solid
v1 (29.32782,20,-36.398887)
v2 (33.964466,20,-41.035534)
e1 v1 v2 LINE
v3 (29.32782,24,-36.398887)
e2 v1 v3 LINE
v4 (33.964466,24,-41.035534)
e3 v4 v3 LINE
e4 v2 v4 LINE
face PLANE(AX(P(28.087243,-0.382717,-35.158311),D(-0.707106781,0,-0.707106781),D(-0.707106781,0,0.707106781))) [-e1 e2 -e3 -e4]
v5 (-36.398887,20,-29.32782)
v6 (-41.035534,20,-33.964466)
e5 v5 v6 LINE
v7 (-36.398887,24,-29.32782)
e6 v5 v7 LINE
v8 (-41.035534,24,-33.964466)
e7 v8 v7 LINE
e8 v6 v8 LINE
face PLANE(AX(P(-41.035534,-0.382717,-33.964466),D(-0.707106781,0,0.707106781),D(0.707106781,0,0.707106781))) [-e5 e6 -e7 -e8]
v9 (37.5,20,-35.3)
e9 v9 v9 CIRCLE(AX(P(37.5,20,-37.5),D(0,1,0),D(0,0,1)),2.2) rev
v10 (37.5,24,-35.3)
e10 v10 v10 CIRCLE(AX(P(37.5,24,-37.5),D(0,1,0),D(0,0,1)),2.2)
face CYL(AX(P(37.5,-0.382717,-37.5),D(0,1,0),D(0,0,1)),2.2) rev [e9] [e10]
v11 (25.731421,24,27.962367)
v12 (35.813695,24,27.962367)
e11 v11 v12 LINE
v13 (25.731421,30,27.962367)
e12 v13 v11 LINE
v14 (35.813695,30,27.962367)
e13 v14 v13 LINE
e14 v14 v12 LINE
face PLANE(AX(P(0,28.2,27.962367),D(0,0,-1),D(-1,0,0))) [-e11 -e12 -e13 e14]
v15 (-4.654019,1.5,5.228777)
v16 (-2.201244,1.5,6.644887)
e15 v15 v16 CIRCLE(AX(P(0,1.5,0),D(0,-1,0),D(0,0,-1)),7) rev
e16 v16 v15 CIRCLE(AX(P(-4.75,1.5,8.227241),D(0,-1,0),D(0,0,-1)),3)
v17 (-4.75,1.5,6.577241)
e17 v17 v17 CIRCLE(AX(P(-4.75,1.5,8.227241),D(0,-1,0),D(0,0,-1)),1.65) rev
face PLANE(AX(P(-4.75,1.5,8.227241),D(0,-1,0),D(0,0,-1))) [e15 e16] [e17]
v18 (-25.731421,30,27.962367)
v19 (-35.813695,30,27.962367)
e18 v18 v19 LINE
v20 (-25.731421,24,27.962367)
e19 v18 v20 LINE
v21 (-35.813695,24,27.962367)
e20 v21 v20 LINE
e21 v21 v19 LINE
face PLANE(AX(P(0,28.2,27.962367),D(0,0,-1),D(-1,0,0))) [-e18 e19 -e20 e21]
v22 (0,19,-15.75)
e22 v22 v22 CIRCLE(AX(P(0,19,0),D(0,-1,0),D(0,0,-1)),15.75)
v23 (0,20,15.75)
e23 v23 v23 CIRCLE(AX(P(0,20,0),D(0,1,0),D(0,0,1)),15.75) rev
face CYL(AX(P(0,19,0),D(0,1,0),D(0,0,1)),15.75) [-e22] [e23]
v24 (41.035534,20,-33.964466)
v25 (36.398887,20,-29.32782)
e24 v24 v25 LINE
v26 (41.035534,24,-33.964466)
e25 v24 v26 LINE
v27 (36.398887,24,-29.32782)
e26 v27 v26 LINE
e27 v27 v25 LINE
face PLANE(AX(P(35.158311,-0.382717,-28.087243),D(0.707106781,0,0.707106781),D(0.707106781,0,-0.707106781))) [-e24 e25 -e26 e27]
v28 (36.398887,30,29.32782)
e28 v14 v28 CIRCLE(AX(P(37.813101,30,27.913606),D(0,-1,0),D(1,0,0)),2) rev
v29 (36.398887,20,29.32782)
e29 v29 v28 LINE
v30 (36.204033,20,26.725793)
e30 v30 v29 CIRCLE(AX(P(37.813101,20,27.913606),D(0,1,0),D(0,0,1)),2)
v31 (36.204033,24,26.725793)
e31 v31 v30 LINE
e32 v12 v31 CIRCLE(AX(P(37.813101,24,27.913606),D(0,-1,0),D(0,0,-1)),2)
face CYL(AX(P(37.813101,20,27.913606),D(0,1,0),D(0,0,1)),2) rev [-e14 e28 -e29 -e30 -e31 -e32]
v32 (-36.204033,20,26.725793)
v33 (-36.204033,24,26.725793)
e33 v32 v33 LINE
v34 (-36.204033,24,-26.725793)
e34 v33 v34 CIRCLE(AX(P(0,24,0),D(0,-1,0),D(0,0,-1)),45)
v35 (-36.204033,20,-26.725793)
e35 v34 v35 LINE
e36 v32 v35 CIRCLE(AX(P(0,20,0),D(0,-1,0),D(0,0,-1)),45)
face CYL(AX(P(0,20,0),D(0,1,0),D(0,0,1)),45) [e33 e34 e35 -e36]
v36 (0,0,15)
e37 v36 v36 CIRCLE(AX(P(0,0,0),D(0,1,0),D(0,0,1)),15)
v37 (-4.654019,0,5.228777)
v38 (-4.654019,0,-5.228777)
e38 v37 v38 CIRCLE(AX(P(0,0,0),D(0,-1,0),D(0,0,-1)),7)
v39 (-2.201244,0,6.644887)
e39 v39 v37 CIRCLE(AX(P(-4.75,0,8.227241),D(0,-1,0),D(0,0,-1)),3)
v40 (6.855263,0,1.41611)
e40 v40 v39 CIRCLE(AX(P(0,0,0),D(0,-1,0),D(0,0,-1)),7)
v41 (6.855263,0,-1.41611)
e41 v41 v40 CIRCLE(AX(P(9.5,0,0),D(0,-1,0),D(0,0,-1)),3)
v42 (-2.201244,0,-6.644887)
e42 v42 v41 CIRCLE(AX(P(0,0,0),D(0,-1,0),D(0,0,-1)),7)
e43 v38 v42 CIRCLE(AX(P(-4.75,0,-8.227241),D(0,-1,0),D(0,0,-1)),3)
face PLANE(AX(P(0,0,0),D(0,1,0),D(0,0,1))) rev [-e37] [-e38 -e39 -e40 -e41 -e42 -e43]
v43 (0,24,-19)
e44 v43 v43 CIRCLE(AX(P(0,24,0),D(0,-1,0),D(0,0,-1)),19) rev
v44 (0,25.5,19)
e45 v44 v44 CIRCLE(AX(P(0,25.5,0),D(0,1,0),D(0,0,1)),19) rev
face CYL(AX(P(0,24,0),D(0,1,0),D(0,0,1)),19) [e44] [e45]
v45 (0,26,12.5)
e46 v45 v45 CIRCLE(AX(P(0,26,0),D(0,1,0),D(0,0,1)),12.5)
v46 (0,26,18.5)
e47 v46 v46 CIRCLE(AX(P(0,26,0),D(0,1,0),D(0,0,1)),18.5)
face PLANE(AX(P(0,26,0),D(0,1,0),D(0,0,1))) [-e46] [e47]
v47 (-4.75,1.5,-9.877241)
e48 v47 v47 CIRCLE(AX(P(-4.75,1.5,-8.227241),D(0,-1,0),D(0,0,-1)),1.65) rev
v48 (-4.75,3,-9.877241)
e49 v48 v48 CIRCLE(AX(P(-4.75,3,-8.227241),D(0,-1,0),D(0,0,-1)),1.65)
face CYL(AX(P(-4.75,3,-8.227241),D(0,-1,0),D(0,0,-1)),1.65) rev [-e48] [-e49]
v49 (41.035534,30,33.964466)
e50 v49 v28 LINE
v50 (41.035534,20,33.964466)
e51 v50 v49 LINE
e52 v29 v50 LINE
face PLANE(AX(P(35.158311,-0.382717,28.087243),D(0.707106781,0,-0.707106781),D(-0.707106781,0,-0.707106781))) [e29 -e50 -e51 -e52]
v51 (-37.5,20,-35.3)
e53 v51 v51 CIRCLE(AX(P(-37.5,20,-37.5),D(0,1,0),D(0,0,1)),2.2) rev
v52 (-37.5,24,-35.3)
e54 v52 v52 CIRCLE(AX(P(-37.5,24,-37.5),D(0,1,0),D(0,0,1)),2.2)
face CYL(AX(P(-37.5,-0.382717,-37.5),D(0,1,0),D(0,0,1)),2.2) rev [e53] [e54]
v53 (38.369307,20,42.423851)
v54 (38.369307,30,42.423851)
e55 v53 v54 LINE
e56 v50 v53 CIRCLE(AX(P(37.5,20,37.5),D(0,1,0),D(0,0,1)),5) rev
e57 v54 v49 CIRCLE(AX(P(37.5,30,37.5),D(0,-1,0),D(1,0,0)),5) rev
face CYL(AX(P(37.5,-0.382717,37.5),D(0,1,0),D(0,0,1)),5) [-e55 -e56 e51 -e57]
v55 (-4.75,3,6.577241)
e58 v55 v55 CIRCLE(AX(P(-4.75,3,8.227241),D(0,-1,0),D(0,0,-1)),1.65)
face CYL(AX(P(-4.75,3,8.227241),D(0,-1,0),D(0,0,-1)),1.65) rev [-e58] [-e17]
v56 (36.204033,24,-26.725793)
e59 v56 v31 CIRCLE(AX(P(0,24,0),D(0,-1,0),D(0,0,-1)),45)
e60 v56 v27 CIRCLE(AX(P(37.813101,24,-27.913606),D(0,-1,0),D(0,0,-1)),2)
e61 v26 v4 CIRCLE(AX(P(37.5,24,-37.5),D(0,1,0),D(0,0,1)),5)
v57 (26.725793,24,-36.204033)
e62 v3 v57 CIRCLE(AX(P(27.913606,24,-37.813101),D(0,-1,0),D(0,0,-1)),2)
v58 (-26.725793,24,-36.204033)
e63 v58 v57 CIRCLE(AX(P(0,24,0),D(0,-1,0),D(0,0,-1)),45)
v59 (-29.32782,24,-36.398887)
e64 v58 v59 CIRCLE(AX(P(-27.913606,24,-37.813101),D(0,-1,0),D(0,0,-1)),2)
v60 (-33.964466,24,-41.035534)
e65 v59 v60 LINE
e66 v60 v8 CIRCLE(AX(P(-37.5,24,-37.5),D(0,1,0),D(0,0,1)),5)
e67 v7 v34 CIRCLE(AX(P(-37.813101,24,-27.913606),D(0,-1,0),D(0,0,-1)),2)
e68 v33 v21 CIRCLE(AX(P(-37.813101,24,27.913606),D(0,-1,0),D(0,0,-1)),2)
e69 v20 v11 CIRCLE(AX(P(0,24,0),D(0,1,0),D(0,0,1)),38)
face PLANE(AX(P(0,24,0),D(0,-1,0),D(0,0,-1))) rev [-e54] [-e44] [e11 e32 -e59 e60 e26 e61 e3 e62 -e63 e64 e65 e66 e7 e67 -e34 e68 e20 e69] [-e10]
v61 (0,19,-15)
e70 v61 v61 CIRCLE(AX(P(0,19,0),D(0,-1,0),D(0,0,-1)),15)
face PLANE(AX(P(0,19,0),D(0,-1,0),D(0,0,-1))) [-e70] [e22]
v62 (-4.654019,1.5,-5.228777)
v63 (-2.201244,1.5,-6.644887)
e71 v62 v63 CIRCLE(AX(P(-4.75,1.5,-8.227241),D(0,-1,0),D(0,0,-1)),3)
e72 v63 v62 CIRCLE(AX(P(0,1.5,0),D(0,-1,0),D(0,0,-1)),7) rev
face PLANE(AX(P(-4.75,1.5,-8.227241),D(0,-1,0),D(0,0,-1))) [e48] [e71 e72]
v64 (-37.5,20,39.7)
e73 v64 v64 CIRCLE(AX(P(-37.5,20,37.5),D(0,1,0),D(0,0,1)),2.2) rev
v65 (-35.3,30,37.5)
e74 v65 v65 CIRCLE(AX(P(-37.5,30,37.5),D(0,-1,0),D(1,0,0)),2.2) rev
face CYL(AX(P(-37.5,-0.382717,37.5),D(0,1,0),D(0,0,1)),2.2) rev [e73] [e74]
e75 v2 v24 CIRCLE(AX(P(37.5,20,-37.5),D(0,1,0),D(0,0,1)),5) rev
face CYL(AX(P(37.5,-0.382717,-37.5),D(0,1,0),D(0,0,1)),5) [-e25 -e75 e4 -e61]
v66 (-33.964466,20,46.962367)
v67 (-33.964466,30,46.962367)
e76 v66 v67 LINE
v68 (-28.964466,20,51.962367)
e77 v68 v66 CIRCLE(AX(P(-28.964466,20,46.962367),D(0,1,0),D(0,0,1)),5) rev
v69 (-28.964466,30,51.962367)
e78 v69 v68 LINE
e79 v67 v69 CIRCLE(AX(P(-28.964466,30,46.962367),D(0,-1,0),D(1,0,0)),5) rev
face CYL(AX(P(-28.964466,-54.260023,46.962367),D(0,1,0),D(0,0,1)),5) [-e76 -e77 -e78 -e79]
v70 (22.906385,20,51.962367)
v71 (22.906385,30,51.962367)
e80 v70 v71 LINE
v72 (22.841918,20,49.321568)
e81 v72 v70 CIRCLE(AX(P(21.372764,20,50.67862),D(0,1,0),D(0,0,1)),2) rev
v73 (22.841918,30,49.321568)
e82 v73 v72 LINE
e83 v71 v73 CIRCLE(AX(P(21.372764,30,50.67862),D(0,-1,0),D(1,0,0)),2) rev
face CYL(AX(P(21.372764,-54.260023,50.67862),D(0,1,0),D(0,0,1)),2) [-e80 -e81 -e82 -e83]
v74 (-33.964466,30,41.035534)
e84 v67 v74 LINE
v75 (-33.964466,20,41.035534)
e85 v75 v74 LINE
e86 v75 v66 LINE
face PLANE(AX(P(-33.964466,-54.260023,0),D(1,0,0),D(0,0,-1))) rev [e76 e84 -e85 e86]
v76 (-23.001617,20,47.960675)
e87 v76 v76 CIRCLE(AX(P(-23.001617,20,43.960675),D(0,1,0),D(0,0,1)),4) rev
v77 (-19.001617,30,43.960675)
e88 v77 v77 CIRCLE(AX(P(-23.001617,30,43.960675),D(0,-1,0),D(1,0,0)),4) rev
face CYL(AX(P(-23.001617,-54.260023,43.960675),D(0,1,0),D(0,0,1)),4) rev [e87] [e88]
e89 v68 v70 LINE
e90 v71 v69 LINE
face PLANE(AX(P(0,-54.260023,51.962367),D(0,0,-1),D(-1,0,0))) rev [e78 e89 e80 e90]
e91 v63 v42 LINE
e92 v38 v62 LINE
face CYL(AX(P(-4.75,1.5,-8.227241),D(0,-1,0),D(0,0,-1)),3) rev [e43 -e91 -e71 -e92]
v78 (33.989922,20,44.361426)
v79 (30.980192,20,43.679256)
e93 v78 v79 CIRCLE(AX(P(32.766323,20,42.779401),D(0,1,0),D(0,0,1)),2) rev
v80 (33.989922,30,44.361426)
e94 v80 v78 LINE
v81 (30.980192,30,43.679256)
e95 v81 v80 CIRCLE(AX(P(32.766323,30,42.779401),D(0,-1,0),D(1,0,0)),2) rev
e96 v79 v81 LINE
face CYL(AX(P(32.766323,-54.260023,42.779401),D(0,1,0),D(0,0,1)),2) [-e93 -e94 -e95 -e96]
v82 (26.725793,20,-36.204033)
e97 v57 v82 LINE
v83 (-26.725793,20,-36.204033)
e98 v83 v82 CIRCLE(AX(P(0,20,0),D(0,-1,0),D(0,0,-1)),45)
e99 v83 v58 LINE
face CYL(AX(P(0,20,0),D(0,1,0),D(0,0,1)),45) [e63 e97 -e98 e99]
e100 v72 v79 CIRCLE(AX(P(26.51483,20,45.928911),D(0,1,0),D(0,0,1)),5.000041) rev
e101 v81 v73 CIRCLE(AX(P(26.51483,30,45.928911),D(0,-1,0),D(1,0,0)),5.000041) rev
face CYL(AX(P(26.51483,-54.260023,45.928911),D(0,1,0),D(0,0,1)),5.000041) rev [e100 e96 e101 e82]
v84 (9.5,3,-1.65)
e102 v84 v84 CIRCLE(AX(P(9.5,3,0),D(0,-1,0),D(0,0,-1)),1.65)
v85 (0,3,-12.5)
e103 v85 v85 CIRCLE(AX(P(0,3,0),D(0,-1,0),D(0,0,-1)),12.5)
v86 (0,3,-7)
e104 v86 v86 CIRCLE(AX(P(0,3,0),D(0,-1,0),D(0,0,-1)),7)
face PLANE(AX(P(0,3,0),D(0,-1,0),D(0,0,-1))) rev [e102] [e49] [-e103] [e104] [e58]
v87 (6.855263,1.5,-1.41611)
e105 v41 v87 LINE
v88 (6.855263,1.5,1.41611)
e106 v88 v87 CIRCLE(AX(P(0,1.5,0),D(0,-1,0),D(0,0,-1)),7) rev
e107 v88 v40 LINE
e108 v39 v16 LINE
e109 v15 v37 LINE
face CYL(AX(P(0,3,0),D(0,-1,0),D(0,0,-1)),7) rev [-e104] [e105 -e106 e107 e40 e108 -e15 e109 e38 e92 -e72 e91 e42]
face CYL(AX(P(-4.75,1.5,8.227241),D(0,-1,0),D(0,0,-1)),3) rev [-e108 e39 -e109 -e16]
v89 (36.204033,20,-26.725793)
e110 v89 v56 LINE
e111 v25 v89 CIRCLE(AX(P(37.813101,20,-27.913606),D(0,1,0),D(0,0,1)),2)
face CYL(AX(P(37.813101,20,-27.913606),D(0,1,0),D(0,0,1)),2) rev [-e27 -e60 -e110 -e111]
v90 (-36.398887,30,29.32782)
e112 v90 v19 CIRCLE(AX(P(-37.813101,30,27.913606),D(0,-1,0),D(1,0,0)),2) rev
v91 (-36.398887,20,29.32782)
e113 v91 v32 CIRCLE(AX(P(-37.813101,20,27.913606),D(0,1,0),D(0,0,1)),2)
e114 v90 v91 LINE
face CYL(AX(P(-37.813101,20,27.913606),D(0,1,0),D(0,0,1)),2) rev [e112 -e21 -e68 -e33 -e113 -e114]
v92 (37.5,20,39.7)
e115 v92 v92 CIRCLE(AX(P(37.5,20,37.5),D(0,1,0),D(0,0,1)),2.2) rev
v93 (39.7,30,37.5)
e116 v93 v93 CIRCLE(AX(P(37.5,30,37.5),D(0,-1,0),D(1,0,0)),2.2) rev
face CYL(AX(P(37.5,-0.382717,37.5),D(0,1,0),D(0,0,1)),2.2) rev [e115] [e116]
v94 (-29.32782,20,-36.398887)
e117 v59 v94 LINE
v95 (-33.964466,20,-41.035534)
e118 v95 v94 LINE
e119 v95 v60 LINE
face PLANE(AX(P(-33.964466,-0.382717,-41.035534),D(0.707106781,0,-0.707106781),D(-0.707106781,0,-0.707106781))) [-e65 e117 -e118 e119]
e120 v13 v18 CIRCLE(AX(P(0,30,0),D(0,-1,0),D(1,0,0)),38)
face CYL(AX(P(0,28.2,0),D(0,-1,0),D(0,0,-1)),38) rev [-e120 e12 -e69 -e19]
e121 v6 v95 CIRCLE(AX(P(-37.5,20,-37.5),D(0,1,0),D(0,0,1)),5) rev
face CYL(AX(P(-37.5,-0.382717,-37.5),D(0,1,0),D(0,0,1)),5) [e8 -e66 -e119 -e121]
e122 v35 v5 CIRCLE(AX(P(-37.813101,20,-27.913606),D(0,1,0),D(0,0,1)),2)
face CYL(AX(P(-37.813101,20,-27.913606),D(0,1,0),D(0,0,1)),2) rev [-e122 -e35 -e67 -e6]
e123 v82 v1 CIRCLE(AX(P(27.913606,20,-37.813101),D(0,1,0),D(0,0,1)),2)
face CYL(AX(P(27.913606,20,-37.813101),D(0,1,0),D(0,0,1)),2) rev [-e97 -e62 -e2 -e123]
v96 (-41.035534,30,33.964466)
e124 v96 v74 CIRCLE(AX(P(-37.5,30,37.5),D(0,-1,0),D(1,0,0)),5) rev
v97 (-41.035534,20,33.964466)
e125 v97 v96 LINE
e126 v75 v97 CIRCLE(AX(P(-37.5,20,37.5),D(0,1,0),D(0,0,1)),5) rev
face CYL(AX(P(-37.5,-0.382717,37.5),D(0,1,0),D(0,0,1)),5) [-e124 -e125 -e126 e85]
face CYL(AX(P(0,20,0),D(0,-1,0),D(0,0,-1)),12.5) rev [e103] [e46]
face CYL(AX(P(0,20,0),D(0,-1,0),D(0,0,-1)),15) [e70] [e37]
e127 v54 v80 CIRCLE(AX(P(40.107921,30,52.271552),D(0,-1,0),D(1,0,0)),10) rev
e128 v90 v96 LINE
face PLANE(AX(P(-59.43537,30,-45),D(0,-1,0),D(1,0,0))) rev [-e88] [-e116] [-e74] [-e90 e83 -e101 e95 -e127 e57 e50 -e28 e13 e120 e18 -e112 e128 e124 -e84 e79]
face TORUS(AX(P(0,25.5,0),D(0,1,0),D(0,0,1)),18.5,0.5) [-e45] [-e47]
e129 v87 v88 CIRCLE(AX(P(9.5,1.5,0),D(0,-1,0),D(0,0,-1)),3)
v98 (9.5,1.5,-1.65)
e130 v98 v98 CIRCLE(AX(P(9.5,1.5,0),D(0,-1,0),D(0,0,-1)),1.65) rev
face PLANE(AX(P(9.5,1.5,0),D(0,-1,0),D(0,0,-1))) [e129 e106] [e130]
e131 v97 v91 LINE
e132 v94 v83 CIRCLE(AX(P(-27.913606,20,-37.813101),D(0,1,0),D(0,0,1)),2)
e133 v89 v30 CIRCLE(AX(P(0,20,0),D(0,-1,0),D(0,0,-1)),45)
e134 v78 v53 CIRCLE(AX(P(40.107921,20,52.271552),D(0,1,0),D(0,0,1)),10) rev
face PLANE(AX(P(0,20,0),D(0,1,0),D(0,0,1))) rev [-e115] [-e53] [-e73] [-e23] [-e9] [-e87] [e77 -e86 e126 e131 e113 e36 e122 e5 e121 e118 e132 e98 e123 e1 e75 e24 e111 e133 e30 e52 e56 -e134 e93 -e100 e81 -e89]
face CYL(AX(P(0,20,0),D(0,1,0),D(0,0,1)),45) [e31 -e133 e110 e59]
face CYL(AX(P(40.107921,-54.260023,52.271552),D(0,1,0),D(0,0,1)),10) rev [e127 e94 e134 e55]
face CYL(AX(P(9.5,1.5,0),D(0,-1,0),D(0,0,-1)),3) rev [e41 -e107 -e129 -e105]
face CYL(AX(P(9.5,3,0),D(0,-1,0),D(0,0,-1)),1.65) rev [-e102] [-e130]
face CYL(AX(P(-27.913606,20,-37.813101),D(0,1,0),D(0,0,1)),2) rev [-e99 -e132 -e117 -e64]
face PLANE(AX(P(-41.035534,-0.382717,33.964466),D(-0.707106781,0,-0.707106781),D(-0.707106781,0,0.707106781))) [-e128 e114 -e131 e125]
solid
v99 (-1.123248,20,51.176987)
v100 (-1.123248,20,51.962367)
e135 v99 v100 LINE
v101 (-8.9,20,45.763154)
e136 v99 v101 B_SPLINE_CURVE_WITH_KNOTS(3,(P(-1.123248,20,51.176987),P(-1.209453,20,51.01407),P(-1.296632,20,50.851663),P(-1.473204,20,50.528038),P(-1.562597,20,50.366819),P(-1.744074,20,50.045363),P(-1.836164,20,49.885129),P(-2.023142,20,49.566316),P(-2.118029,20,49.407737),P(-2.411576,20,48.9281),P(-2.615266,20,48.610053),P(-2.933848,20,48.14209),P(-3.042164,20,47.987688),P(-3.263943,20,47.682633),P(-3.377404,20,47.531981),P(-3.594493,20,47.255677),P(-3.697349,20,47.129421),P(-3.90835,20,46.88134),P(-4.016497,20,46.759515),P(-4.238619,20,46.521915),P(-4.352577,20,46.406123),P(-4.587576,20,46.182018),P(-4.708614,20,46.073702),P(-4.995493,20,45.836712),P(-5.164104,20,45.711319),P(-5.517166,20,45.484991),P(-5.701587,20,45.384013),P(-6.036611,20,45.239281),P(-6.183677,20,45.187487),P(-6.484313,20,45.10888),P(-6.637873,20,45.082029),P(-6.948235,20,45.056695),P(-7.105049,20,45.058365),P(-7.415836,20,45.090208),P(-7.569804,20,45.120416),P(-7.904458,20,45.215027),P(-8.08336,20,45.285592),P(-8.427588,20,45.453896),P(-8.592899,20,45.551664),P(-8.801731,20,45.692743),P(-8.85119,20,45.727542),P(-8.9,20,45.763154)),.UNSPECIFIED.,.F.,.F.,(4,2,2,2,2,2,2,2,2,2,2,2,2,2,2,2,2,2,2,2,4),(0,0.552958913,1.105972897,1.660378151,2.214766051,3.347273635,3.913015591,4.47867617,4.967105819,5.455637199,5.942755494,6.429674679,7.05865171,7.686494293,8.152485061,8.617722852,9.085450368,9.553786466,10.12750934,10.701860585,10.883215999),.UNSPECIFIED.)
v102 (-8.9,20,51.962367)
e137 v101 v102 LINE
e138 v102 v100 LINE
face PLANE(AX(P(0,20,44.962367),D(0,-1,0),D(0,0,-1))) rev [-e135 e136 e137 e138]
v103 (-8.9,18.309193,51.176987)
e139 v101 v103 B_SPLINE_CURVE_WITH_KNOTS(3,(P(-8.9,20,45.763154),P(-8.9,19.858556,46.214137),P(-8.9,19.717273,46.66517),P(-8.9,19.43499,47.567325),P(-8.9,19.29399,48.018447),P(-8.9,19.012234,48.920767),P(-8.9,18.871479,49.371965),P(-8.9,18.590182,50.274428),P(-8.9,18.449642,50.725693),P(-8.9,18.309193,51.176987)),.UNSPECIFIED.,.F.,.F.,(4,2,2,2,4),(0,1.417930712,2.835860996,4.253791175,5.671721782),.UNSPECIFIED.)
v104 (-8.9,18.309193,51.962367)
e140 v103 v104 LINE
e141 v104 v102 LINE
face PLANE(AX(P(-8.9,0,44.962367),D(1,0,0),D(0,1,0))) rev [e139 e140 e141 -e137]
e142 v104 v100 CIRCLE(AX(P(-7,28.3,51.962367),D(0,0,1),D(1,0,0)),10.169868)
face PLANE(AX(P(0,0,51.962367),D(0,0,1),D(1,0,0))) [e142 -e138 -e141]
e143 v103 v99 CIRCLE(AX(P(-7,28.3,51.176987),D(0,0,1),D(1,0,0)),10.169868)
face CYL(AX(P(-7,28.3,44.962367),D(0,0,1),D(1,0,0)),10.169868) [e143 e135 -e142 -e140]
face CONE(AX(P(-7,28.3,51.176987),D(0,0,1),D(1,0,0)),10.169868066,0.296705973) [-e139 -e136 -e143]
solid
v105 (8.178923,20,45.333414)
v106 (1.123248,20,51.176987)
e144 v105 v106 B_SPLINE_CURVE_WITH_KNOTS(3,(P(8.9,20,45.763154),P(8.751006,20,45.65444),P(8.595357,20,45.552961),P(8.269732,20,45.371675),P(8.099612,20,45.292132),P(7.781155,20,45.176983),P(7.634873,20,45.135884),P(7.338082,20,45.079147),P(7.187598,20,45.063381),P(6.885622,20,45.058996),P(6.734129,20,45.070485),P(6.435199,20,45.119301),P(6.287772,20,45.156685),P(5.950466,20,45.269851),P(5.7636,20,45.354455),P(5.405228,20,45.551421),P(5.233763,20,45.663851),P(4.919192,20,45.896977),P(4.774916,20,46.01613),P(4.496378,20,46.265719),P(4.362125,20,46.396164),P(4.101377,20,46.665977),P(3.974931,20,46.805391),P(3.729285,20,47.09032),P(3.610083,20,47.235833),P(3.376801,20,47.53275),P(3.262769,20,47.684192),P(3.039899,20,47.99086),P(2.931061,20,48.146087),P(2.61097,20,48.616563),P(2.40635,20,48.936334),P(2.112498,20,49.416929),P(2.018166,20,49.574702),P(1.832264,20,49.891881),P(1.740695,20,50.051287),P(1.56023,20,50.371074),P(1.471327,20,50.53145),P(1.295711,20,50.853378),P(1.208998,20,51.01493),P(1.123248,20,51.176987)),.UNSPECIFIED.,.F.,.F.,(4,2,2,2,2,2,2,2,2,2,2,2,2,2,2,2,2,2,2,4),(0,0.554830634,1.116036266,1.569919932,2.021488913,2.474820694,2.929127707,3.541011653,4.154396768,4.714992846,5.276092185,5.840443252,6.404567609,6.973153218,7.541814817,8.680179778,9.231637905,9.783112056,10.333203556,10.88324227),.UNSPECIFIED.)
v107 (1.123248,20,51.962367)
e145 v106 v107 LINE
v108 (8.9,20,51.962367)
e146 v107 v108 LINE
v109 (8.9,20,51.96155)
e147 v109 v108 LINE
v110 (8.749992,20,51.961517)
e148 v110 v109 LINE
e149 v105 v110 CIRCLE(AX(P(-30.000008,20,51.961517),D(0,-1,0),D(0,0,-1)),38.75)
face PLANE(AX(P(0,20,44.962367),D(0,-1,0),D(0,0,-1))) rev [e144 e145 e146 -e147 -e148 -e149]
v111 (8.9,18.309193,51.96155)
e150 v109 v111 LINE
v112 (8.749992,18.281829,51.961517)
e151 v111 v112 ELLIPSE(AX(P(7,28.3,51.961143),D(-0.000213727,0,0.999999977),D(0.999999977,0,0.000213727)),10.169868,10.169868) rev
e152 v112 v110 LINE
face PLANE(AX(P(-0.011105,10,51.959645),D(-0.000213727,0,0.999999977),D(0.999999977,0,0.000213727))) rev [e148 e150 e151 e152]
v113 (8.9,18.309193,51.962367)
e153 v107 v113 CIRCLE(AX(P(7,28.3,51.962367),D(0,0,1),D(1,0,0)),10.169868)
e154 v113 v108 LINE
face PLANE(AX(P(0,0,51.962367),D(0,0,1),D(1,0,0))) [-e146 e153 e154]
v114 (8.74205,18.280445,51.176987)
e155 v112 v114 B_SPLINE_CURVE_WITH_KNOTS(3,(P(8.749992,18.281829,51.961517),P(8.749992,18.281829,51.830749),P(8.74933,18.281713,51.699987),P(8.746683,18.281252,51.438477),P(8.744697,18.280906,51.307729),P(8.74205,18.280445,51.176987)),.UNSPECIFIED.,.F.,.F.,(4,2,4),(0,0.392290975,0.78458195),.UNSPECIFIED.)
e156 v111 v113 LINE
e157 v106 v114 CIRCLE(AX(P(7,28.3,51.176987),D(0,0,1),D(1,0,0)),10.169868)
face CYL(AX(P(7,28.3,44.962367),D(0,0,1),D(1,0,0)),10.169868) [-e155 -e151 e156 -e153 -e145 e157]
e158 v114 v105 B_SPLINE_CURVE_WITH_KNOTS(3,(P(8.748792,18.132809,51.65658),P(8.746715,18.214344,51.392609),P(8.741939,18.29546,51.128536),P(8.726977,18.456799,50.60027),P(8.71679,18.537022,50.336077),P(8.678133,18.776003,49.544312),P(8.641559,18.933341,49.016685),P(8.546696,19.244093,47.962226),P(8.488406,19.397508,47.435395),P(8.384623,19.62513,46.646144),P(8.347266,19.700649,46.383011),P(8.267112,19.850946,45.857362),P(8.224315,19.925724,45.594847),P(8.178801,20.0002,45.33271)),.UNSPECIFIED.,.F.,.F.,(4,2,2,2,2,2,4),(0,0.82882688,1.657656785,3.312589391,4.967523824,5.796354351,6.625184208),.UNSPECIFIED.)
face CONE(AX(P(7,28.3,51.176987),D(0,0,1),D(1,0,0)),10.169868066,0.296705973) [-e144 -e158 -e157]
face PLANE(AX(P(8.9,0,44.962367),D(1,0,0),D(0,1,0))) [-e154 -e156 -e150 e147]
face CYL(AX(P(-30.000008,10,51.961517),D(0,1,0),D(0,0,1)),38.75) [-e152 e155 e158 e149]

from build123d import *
from build123d.topology import SkipClean

# Parameters (mm, degrees)
SKETCH_1_R               = 15
SKETCH_1_R_2             = 12.5
EXTRUDE_1_DEPTH          = 20
SKETCH_2_R               = 17
SKETCH_2_R_2             = 12.5
EXTRUDE_2_DEPTH          = 6
SKETCH_3_R               = 12.5
SKETCH_3_R_2             = 7
SKETCH_3_R_3             = 1.65
EXTRUDE_3_DEPTH          = 3
EXTRUDE_START            = -2
SKETCH_5_R               = 19
SKETCH_5_R_2             = 17
EXTRUDE_5_DEPTH          = 2
SKETCH_6_W               = 26
SKETCH_6_H               = 26
SKETCH_6_R               = 12.5
EXTRUDE_6_DEPTH          = 2
EXTRUDE_START_2          = 4
SKETCH_7_R               = 45
SKETCH_7_R_2             = 17
EXTRUDE_7_DEPTH          = 4
EXTRUDE_START_3          = -4
SKETCH_8_R               = 2.2
EXTRUDE_8_DEPTH          = 4
SKETCH_9_R               = 4
EXTRUDE_9_DEPTH          = 4
FILLET_1_R               = 2
SKETCH_10_R              = 19
CUT_EXTRUDE_1_DEPTH      = 74.492092218
FILLET_2_R               = 0.5
FILLET_3_R               = 5
SKETCH_11_R              = 3
CUT_EXTRUDE_2_DEPTH      = 1.5
EXTRUDE_START_4          = 1
SKETCH_12_R              = 15.75
SKETCH_12_R_2            = 15
EXTRUDE_10_DEPTH         = 1
SKETCH_13_R              = 4
SKETCH_13_R_2            = 2.2
EXTRUDE_11_DEPTH         = 4.2
EXTRUDE_12_DEPTH         = 7
EXTRUDE_12_2_DEPTH       = 7
CHAMFER_1_SIZE           = 6.214619975
CHAMFER_1_SIZE_2         = 1.9
CHAMFER_2_SIZE           = 6.214619975
CHAMFER_2_SIZE_2         = 1.9
CUT_EXTRUDE_4_DEPTH      = 10
FILLET_4_R               = 2
SKETCH_16_R              = 2.2
SKETCH_16_R_2            = 4
EXTRUDE_13_DEPTH         = 3
CUT_EXTRUDE_START        = -0.2
CUT_EXTRUDE_5_DEPTH      = 0.2
CUT_EXTRUDE_6_DEPTH      = 112.30004797
CUT_EXTRUDE_6_DEPTH_BACK = 112.30004797
SKETCH_18_W              = 118.870739278
SKETCH_18_H              = 2


with BuildPart() as part:
    # 草图1 → 凸台-拉伸1 (new body)
    with BuildSketch(Plane(origin=(0, 0, 0), x_dir=(1, 0, 0), z_dir=(0, 1, 0))):
        with Locations(Location((0, 0, 0), (0, 0, 270))):
            Circle(SKETCH_1_R)
        with Locations(Location((0, 0, 0), (0, 0, 270))):
            Circle(SKETCH_1_R_2, mode=Mode.SUBTRACT)
    extrude(amount=EXTRUDE_1_DEPTH)

    # 草图2 → 凸台-拉伸2 (add)
    with BuildSketch(Plane(origin=(0, 20, 0), x_dir=(1, 0, 0), z_dir=(0, 1, 0))):
        with Locations(Location((0, 0, 0), (0, 0, 270))):
            Circle(SKETCH_2_R)
        with Locations(Location((0, 0, 0), (0, 0, 270))):
            Circle(SKETCH_2_R_2, mode=Mode.SUBTRACT)
    extrude(amount=EXTRUDE_2_DEPTH)

    # 草图3 → 凸台-拉伸3 (add)
    with BuildSketch(Plane.XZ):
        with Locations(Location((0, 0, 0), (0, 0, 270))):
            Circle(SKETCH_3_R)
        with Locations(Location((0, 0, 0), (0, 0, 270))):
            Circle(SKETCH_3_R_2, mode=Mode.SUBTRACT)
        with Locations(Location((9.5, 0, 0), (0, 0, 270))):
            Circle(SKETCH_3_R_3, mode=Mode.SUBTRACT)
        with Locations(Location((-4.75, -8.227241336, 0), (0, 0, 270))):
            Circle(SKETCH_3_R_3, mode=Mode.SUBTRACT)
        with Locations(Location((-4.75, 8.227241336, 0), (0, 0, 270))):
            Circle(SKETCH_3_R_3, mode=Mode.SUBTRACT)
    extrude(amount=-EXTRUDE_3_DEPTH)

    # 草图5 → 凸台-拉伸5 (add)
    with BuildSketch(Plane(origin=(0, 26, 0), x_dir=(1, 0, 0), z_dir=(0, 1, 0)).offset(EXTRUDE_START)):
        with Locations(Location((0, 0, 0), (0, 0, 270))):
            Circle(SKETCH_5_R)
        with Locations(Location((0, 0, 0), (0, 0, 270))):
            Circle(SKETCH_5_R_2, mode=Mode.SUBTRACT)
    extrude(amount=EXTRUDE_5_DEPTH)

    # 草图6 → 凸台-拉伸6 (add)
    with BuildSketch(Plane(origin=(0, 26, 0), x_dir=(1, 0, 0), z_dir=(0, 1, 0))):
        Rectangle(SKETCH_6_W, SKETCH_6_H)
        with Locations(Location((0, 0, 0), (0, 0, 90))):
            Circle(SKETCH_6_R, mode=Mode.SUBTRACT)
    extrude(amount=EXTRUDE_6_DEPTH)

    # 草图7 → 凸台-拉伸7 (add)
    with BuildSketch(Plane.XZ.offset(-24).offset(EXTRUDE_START_2)):
        with Locations(Location((0, 0, 0), (0, 0, 270))):
            Circle(SKETCH_7_R)
        Circle(SKETCH_7_R_2, mode=Mode.SUBTRACT)
    extrude(amount=-EXTRUDE_7_DEPTH)

    # 草图8 → 凸台-拉伸8 (add)
    # profile 1 of 4: a face of its own
    with BuildSketch(Plane(origin=(0, 24, 0), x_dir=(1, 0, 0), z_dir=(0, 1, 0)).offset(EXTRUDE_START_3)):
        with BuildLine():
            Line((-41.035533906, -33.964466094), (-35.158310508, -28.087242696))
            ThreePointArc((-35.158310508, -28.087242696), (-31.819805153, -31.819805153), (-28.087242696, -35.158310508))
            Line((-28.087242696, -35.158310508), (-33.964466094, -41.035533906))
            ThreePointArc((-33.964466094, -41.035533906), (-41.035533906, -41.035533906), (-41.035533906, -33.964466094))
        make_face()
        with Locations(Location((-37.5, -37.5, 0), (0, 0, 270))):
            Circle(SKETCH_8_R, mode=Mode.SUBTRACT)
    # profile 2 of 4: a face of its own
    with BuildSketch(Plane(origin=(0, 24, 0), x_dir=(1, 0, 0), z_dir=(0, 1, 0)).offset(EXTRUDE_START_3)):
        with BuildLine():
            Line((-41.035533906, 33.964466094), (-35.158310508, 28.087242696))
            ThreePointArc((-35.158310508, 28.087242696), (-31.819805153, 31.819805153), (-28.087242696, 35.158310508))
            Line((-28.087242696, 35.158310508), (-33.964466094, 41.035533906))
            ThreePointArc((-33.964466094, 41.035533906), (-41.035533906, 41.035533906), (-41.035533906, 33.964466094))
        make_face()
        with Locations(Location((-37.5, 37.5, 0), (0, 0, 270))):
            Circle(SKETCH_8_R, mode=Mode.SUBTRACT)
    # profile 3 of 4: a face of its own
    with BuildSketch(Plane(origin=(0, 24, 0), x_dir=(1, 0, 0), z_dir=(0, 1, 0)).offset(EXTRUDE_START_3)):
        with BuildLine():
            Line((28.087242696, 35.158310508), (33.964466094, 41.035533906))
            ThreePointArc((33.964466094, 41.035533906), (41.035533906, 41.035533906), (41.035533906, 33.964466094))
            Line((41.035533906, 33.964466094), (35.158310508, 28.087242696))
            ThreePointArc((35.158310508, 28.087242696), (31.819805153, 31.819805153), (28.087242696, 35.158310508))
        make_face()
        with Locations(Location((37.5, 37.5, 0), (0, 0, 270))):
            Circle(SKETCH_8_R, mode=Mode.SUBTRACT)
    # profile 4 of 4: a face of its own
    with BuildSketch(Plane(origin=(0, 24, 0), x_dir=(1, 0, 0), z_dir=(0, 1, 0)).offset(EXTRUDE_START_3)):
        with BuildLine():
            Line((35.158310508, -28.087242696), (41.035533906, -33.964466094))
            ThreePointArc((41.035533906, -33.964466094), (41.035533906, -41.035533906), (33.964466094, -41.035533906))
            Line((33.964466094, -41.035533906), (28.087242696, -35.158310508))
            ThreePointArc((28.087242696, -35.158310508), (31.819805153, -31.819805153), (35.158310508, -28.087242696))
        make_face()
        with Locations(Location((37.5, -37.5, 0), (0, 0, 270))):
            Circle(SKETCH_8_R, mode=Mode.SUBTRACT)
    extrude(amount=EXTRUDE_8_DEPTH)

    # 草图9 → 凸台-拉伸9 (add)
    with BuildSketch(Plane(origin=(0, 24, 0), x_dir=(1, 0, 0), z_dir=(0, 1, 0)).offset(EXTRUDE_START_3)):
        with BuildLine():
            Line((33.964466094, -41.035533906), (28.087242696, -35.158310508))
            ThreePointArc((28.087242696, -35.158310508), (0, -45), (-28.087242696, -35.158310508))
            Line((-28.087242696, -35.158310508), (-33.964466094, -41.035533906))
            Line((-33.964466094, -41.035533906), (-33.964466094, -51.96236733))
            Line((-33.964466094, -51.96236733), (22.906384924, -51.96236733))
            Line((22.906384924, -51.96236733), (27.649740331, -50.798447588))
            ThreePointArc((27.649740331, -50.798447588), (23.364635585, -42.046040599), (31.045885235, -48.043136112))
            ThreePointArc((31.045885235, -48.043136112), (34.020425636, -44.337927578), (38.36930714, -42.423850637))
            ThreePointArc((38.36930714, -42.423850637), (35.996987316, -42.268747516), (33.964466094, -41.035533906))
        make_face()
        with Locations(Location((-23.001616716, -43.96067534, 0), (0, 0, 270))):
            Circle(SKETCH_9_R, mode=Mode.SUBTRACT)
    extrude(amount=EXTRUDE_9_DEPTH)

    # 圆角1
    # the kernel refuses this fillet: 2 mm, written as the material it takes off along each edge
    with BuildSketch(Plane(origin=(31.045885235, 8.214854918, 48.043136112), x_dir=(-0.015052067443698006, 0, -0.9998867112156609), z_dir=(0, 1, 0))) as fillet_1_piece_1:
        with BuildLine():
            CenterArc((5.237242596, -1.799472632), FILLET_1_R, 115.876571243, 100.980737452)
            Line((3.636978972, -2.999121053), (3.6049737, -3.023114021))
            ThreePointArc((3.6049737, -3.023114021), (1.972291731, -1.313047371), (-0.017457357, -0.035989453))
            Line((-0.017457357, -0.035989453), (0.017457357, 0.035989453))
            ThreePointArc((0.017457357, 0.035989453), (2.182187383, -0.461322512), (4.34691741, 0.035989453))
            Line((4.34691741, 0.035989453), (4.364374767, 0))
        make_face()
    extrude(amount=27.570290164, mode=Mode.SUBTRACT)
    with BuildSketch(Plane(origin=(27.649740331, 7.426134815, 50.798447588), x_dir=(-0.9711892764491741, 0, 0.23830944024551268), z_dir=(0, 1, 0))) as fillet_1_piece_2:
        with BuildLine():
            CenterArc((6.067575487, -1.612238295), FILLET_1_R, 126.281523765, 82.66024712)
            Line((4.317351562, -2.580079301), (4.282347084, -2.599436121))
            ThreePointArc((4.282347084, -2.599436121), (2.486180213, -0.742013172), (-0.000465948, -0.039997286))
            Line((-0.000465948, -0.039997286), (0, 0.04))
            ThreePointArc((0, 0.04), (2.442034484, 0.04), (4.860398838, 0.032244766))
            Line((4.860398838, 0.032244766), (4.884068968, 0))
        make_face()
    extrude(amount=29.147730371, mode=Mode.SUBTRACT)

    # 草图10 → 切除-拉伸1 (cut, through all)
    with BuildSketch(Plane(origin=(0, 26, 0), x_dir=(1, 0, 0), z_dir=(0, 1, 0))):
        with Locations(Location((0, 0, 0), (0, 0, 270))):
            Circle(SKETCH_10_R)
    extrude(amount=CUT_EXTRUDE_1_DEPTH, mode=Mode.SUBTRACT)

    # 圆角2
    fillet_2_edges = [part.edges().sort_by_distance(p)[0] for p in [
        (0, 26, -19),
    ]]
    fillet(fillet_2_edges, radius=FILLET_2_R)

    # 圆角3
    fillet_3_edges = [part.edges().sort_by_distance(p)[0] for p in [
        (-33.964466094, 22, 51.96236733),
    ]]
    fillet(fillet_3_edges, radius=FILLET_3_R)

    # 草图11 → 切除-拉伸2 (cut)
    with BuildSketch(Plane.XZ):
        with Locations((-4.75, 8.227241336)):
            Circle(SKETCH_11_R)
        with Locations((9.5, 0)):
            Circle(SKETCH_11_R)
        with Locations((-4.75, -8.227241336)):
            Circle(SKETCH_11_R)
    extrude(amount=-CUT_EXTRUDE_2_DEPTH, mode=Mode.SUBTRACT)

    # 草图12 → 凸台-拉伸10 (add)
    with BuildSketch(Plane.XZ.offset(-20).offset(EXTRUDE_START_4)):
        with Locations(Location((0, 0, 0), (0, 0, 90))):
            Circle(SKETCH_12_R)
        with Locations(Location((0, 0, 0), (0, 0, 270))):
            Circle(SKETCH_12_R_2, mode=Mode.SUBTRACT)
    extrude(amount=-EXTRUDE_10_DEPTH)

    # 草图13 → 凸台-拉伸11 (add)
    # profile 1 of 2: a face of its own
    with BuildSketch(Plane(origin=(0, 24, 0), x_dir=(1, 0, 0), z_dir=(0, 1, 0))):
        with BuildLine():
            Line((-25.73142074, -27.96236733), (-35.257708566, -27.96236733))
            ThreePointArc((-35.257708566, -27.96236733), (-35.2080649, -28.024849081), (-35.158310508, -28.087242696))
            ThreePointArc((-35.158310508, -28.087242696), (0, -45), (35.158310508, -28.087242696))
            ThreePointArc((35.158310508, -28.087242696), (35.2080649, -28.024849081), (35.257708566, -27.96236733))
            Line((35.257708566, -27.96236733), (25.73142074, -27.96236733))
            ThreePointArc((25.73142074, -27.96236733), (0, -38), (-25.73142074, -27.96236733))
        make_face()
    # profile 2 of 2: a face of its own
    with BuildSketch(Plane(origin=(0, 24, 0), x_dir=(1, 0, 0), z_dir=(0, 1, 0))):
        with BuildLine():
            ThreePointArc((35.158310508, -28.087242696), (0, -45), (-35.158310508, -28.087242696))
            Line((-35.158310508, -28.087242696), (-41.035533906, -33.964466094))
            ThreePointArc((-41.035533906, -33.964466094), (-41.035533906, -41.035533906), (-33.964466094, -41.035533906))
            Line((-33.964466094, -41.035533906), (-33.964466094, -46.96236733))
            ThreePointArc((-33.964466094, -46.96236733), (-32.5, -50.497901236), (-28.964466094, -51.96236733))
            Line((-28.964466094, -51.96236733), (22.906384924, -51.96236733))
            ThreePointArc((22.906384924, -51.96236733), (23.372168796, -50.629809961), (22.841917537, -49.321567873))
            ThreePointArc((22.841917537, -49.321567873), (23.665985567, -41.819836541), (30.980192372, -43.67925578))
            ThreePointArc((30.980192372, -43.67925578), (32.324226236, -44.729926812), (33.989922469, -44.361426197))
            ThreePointArc((33.989922469, -44.361426197), (36.06191813, -43.126615751), (38.36930714, -42.423850637))
            ThreePointArc((38.36930714, -42.423850637), (42.268747516, -39.003012684), (41.035533906, -33.964466094))
            Line((41.035533906, -33.964466094), (35.158310508, -28.087242696))
        make_face()
        with Locations(Location((-23.001616716, -43.96067534, 0), (0, 0, 270))):
            Circle(SKETCH_13_R, mode=Mode.SUBTRACT)
        with Locations(Location((-37.5, -37.5, 0), (0, 0, 270))):
            Circle(SKETCH_13_R_2, mode=Mode.SUBTRACT)
        with Locations(Location((37.5, -37.5, 0), (0, 0, 270))):
            Circle(SKETCH_13_R_2, mode=Mode.SUBTRACT)
    extrude(amount=EXTRUDE_11_DEPTH)

    # 圆角4
    # the kernel refuses this fillet: 2 mm, written as the material it adds along each edge
    with BuildSketch(Plane(origin=(-35.158310508, 24, 28.087242696), x_dir=(-0.6091445543009105, 0, -0.793059210882482), z_dir=(0, 1, 0))) as fillet_4_piece_1_section:
        with BuildLine():
            CenterArc((1.754855317, 1.99963613), FILLET_4_R, 187.472325658, 81.434718893)
            Line((-0.228160265, 1.739541528), (0, 0))
            ThreePointArc((0, 0), (0.858353144, 0.008187079), (1.716706288, 0))
        make_face()
    fillet_4_piece_1 = extrude(amount=4.2, mode=Mode.PRIVATE)
    fillet_4_piece_1 = split(fillet_4_piece_1, bisect_by=Plane(origin=(-35.158310508, 24, 27.96236733), z_dir=(0, 0, 1)), keep=Keep.TOP, mode=Mode.PRIVATE)
    add(fillet_4_piece_1)
    with BuildSketch(Plane(origin=(28.087242696, 20, -35.158310508), x_dir=(0.7071067811865485, 0, -0.7071067811865465), z_dir=(0, 1, 0)), Plane(origin=(-35.158310508, 20, -28.087242696), x_dir=(-0.7071067811865496, 0, -0.7071067811865455), z_dir=(0, 1, 0))) as fillet_4_piece_2:
        with BuildLine():
            CenterArc((1.754440604, 2), FILLET_4_R, 188.565281108, 81.434718892)
            ThreePointArc((-0.223253019, 1.70212766), (-0.103508957, 0.852128537), (0, 0))
            Line((0, 0), (1.754440604, 0))
        make_face()
    extrude(amount=4)
    with BuildSketch(Plane(origin=(35.158310508, 20, -28.087242696), x_dir=(0.6091445542993271, 0, 0.7930592108836982), z_dir=(0, 1, 0)), Plane(origin=(-28.087242696, 20, -35.158310508), x_dir=(0.7930592108837022, 0, -0.6091445542993219), z_dir=(0, 1, 0)), Plane(origin=(-35.158310508, 20, 28.087242696), x_dir=(-0.6091445542993226, 0, -0.7930592108837018), z_dir=(0, 1, 0))) as fillet_4_piece_3:
        with BuildLine():
            CenterArc((1.754855317, 1.99963613), FILLET_4_R, 187.472325658, 81.434718892)
            Line((-0.228160265, 1.739541528), (0, 0))
            ThreePointArc((0, 0), (0.858353144, 0.008187079), (1.716706288, 0))
        make_face()
    extrude(amount=4)
    with BuildSketch(Plane(origin=(35.158310508, 24, 28.087242696), x_dir=(0.6091445574940213, 0, -0.7930592084298707), z_dir=(0, 1, 0))) as fillet_4_piece_4_section:
        with BuildLine():
            CenterArc((1.754855324, -1.99963613), FILLET_4_R, 91.092955673, 81.4347189)
            Line((-0.228160259, -1.739541536), (0, 0))
            ThreePointArc((0, 0), (0.858353144, -0.008187083), (1.716706288, 0))
        make_face()
    fillet_4_piece_4 = extrude(amount=4.2, mode=Mode.PRIVATE)
    fillet_4_piece_4 = split(fillet_4_piece_4, bisect_by=Plane(origin=(35.158310508, 24, 27.96236733), z_dir=(0, 0, 1)), keep=Keep.TOP, mode=Mode.PRIVATE)
    add(fillet_4_piece_4)
    with BuildSketch(Plane(origin=(35.158310508, 20, 28.087242696), x_dir=(0.609144554299323, 0, -0.7930592108837013), z_dir=(0, 1, 0))) as fillet_4_piece_5:
        with BuildLine():
            CenterArc((1.754855317, -1.99963613), FILLET_4_R, 91.09295545, 81.434718892)
            Line((-0.228160265, -1.739541528), (0, 0))
            ThreePointArc((0, 0), (0.858353144, -0.008187079), (1.716706288, 0))
        make_face()
    extrude(amount=4)

    # 草图16 → 凸台-拉伸13 (add)
    with BuildSketch(Plane(origin=(0, 28.2, 0), x_dir=(1, 0, 0), z_dir=(0, 1, 0))):
        with BuildLine():
            Line((-25.73142074, -27.96236733), (-35.813695424, -27.96236733))
            ThreePointArc((-35.813695424, -27.96236733), (-35.974809945, -28.701442447), (-36.398887356, -29.327819544))
            Line((-36.398887356, -29.327819544), (-41.035533906, -33.964466094))
            ThreePointArc((-41.035533906, -33.964466094), (-41.035533906, -41.035533906), (-33.964466094, -41.035533906))
            Line((-33.964466094, -41.035533906), (-33.964466094, -46.96236733))
            ThreePointArc((-33.964466094, -46.96236733), (-32.5, -50.497901236), (-28.964466094, -51.96236733))
            Line((-28.964466094, -51.96236733), (22.906384924, -51.96236733))
            ThreePointArc((22.906384924, -51.96236733), (23.372168796, -50.629809961), (22.841917537, -49.321567873))
            ThreePointArc((22.841917537, -49.321567873), (23.665985567, -41.819836541), (30.980192372, -43.67925578))
            ThreePointArc((30.980192372, -43.67925578), (32.324226236, -44.729926812), (33.989922469, -44.361426197))
            ThreePointArc((33.989922469, -44.361426197), (36.06191813, -43.126615751), (38.36930714, -42.423850637))
            ThreePointArc((38.36930714, -42.423850637), (42.268747516, -39.003012684), (41.035533906, -33.964466094))
            Line((41.035533906, -33.964466094), (36.398887356, -29.327819544))
            ThreePointArc((36.398887356, -29.327819544), (35.974809945, -28.701442447), (35.813695424, -27.96236733))
            Line((35.813695424, -27.96236733), (25.73142074, -27.96236733))
            ThreePointArc((25.73142074, -27.96236733), (0, -38), (-25.73142074, -27.96236733))
        make_face()
        with Locations(Location((-37.5, -37.5, 0), (0, 0, 270))):
            Circle(SKETCH_16_R, mode=Mode.SUBTRACT)
        with Locations(Location((-23.001616716, -43.96067534, 0), (0, 0, 270))):
            Circle(SKETCH_16_R_2, mode=Mode.SUBTRACT)
        with Locations(Location((37.5, -37.5, 0), (0, 0, 270))):
            Circle(SKETCH_16_R, mode=Mode.SUBTRACT)
    extrude(amount=EXTRUDE_13_DEPTH)

    # 草图17 → 切除-拉伸5 (cut)
    with SkipClean():  # the faces are left unmerged after this step: merging them gives an invalid solid
        with BuildSketch(Plane(origin=(0, 31.2, 0), x_dir=(1, 0, 0), z_dir=(0, 1, 0)).offset(CUT_EXTRUDE_START)):
            with BuildLine():
                Line((-25.73142074, -27.96236733), (-35.813695424, -27.96236733))
                ThreePointArc((-35.813695424, -27.96236733), (-35.974809945, -28.701442447), (-36.398887356, -29.327819544))
                Line((-36.398887356, -29.327819544), (-41.035533906, -33.964466094))
                ThreePointArc((-41.035533906, -33.964466094), (-41.035533906, -41.035533906), (-33.964466094, -41.035533906))
                Line((-33.964466094, -41.035533906), (-33.964466094, -46.96236733))
                ThreePointArc((-33.964466094, -46.96236733), (-32.5, -50.497901236), (-28.964466094, -51.96236733))
                Line((-28.964466094, -51.96236733), (22.906384924, -51.96236733))
                ThreePointArc((22.906384924, -51.96236733), (23.372168796, -50.629809961), (22.841917537, -49.321567873))
                ThreePointArc((22.841917537, -49.321567873), (23.665985567, -41.819836541), (30.980192372, -43.67925578))
                ThreePointArc((30.980192372, -43.67925578), (32.324226236, -44.729926812), (33.989922469, -44.361426197))
                ThreePointArc((33.989922469, -44.361426197), (36.06191813, -43.126615751), (38.36930714, -42.423850637))
                ThreePointArc((38.36930714, -42.423850637), (42.268747516, -39.003012684), (41.035533906, -33.964466094))
                Line((41.035533906, -33.964466094), (36.398887356, -29.327819544))
                ThreePointArc((36.398887356, -29.327819544), (35.974809945, -28.701442447), (35.813695424, -27.96236733))
                Line((35.813695424, -27.96236733), (25.73142074, -27.96236733))
                ThreePointArc((25.73142074, -27.96236733), (0, -38), (-25.73142074, -27.96236733))
            make_face()
        extrude(amount=CUT_EXTRUDE_5_DEPTH, mode=Mode.SUBTRACT)

    # 草图18 → 切除-拉伸6 (cut, two sides: drawn at the far end of the back side and taken through both)
    with SkipClean():  # the faces are left unmerged after this step: merging them gives an invalid solid
        with BuildSketch(Plane.XY.offset(51.96236733).offset(-CUT_EXTRUDE_6_DEPTH_BACK)):
            with Locations((0, 31)):
                Rectangle(SKETCH_18_W, SKETCH_18_H)
        extrude(amount=CUT_EXTRUDE_6_DEPTH + CUT_EXTRUDE_6_DEPTH_BACK, mode=Mode.SUBTRACT)


with BuildPart() as body_2:
    # 草图14 → 凸台-拉伸12 (new body)
    with BuildSketch(Plane.XY.offset(51.96236733)):
        with BuildLine():
            Line((-8.9, 20), (-8.9, 18.309193402))
            ThreePointArc((-8.9, 18.309193402), (-4.839364384, 18.362300557), (-1.123247794, 20))
            Line((-1.123247794, 20), (-8.9, 20))
        make_face()
    extrude(amount=-EXTRUDE_12_DEPTH)

    # 倒角2
    # the kernel refuses this chamfer: 6.214619975, 1.9 mm, written as the material it takes off along each edge
    with BuildSketch(Plane(origin=(-7, 28.3, 44.96236733), x_dir=(-0.9793563195214127, 0.20214153312338567, 0), z_dir=(0.20214153312338567, 0.9793563195214127, 0))) as chamfer_2_piece_1:
        Polygon((10.169868066, CHAMFER_2_SIZE), (10.169868066 - CHAMFER_2_SIZE_2, 0), (10.169868066, 0), align=None)
    revolve(axis=Axis((-7, 28.3, 44.96236733), (0, 0, 1)), revolution_arc=227.856914302, mode=Mode.SUBTRACT)


with BuildPart() as body_3:
    # 草图14 → Extrude 12 2 (new body)
    with BuildSketch(Plane.XY.offset(51.96236733)):
        with BuildLine():
            Line((8.9, 18.309193402), (8.9, 20))
            Line((8.9, 20), (1.123247794, 20))
            ThreePointArc((1.123247794, 20), (4.839364384, 18.362300557), (8.9, 18.309193402))
        make_face()
    extrude(amount=-EXTRUDE_12_2_DEPTH)

    # 倒角1
    # the kernel refuses this chamfer: 6.214619975, 1.9 mm, written as the material it takes off along each edge
    with BuildSketch(Plane(origin=(7, 28.3, 44.96236733), x_dir=(-0.8070149800028303, 0.5905309662084042, 0), z_dir=(0.5905309662084042, 0.8070149800028303, 0))) as chamfer_1_piece_1:
        Polygon((10.169868066, CHAMFER_1_SIZE), (10.169868066 - CHAMFER_1_SIZE_2, 0), (10.169868066, 0), align=None)
    revolve(axis=Axis((7, 28.3, 44.96236733), (0, 0, 1)), revolution_arc=227.856914302, mode=Mode.SUBTRACT)

    # 草图15 → 切除-拉伸4 (cut)
    with BuildSketch(Plane.XZ.offset(-20)):
        with BuildLine():
            Line((12.726349477, 51.96236733), (8.749992214, 51.961517474))
            ThreePointArc((8.749992214, 51.961517474), (8.140258783, 45.114432982), (6.330246869, 38.482827009))
            Line((6.330246869, 38.482827009), (12.726349477, 51.96236733))
        make_face()
    extrude(amount=CUT_EXTRUDE_4_DEPTH, mode=Mode.SUBTRACT)


solid = Compound([part.part, body_2.part, body_3.part])
